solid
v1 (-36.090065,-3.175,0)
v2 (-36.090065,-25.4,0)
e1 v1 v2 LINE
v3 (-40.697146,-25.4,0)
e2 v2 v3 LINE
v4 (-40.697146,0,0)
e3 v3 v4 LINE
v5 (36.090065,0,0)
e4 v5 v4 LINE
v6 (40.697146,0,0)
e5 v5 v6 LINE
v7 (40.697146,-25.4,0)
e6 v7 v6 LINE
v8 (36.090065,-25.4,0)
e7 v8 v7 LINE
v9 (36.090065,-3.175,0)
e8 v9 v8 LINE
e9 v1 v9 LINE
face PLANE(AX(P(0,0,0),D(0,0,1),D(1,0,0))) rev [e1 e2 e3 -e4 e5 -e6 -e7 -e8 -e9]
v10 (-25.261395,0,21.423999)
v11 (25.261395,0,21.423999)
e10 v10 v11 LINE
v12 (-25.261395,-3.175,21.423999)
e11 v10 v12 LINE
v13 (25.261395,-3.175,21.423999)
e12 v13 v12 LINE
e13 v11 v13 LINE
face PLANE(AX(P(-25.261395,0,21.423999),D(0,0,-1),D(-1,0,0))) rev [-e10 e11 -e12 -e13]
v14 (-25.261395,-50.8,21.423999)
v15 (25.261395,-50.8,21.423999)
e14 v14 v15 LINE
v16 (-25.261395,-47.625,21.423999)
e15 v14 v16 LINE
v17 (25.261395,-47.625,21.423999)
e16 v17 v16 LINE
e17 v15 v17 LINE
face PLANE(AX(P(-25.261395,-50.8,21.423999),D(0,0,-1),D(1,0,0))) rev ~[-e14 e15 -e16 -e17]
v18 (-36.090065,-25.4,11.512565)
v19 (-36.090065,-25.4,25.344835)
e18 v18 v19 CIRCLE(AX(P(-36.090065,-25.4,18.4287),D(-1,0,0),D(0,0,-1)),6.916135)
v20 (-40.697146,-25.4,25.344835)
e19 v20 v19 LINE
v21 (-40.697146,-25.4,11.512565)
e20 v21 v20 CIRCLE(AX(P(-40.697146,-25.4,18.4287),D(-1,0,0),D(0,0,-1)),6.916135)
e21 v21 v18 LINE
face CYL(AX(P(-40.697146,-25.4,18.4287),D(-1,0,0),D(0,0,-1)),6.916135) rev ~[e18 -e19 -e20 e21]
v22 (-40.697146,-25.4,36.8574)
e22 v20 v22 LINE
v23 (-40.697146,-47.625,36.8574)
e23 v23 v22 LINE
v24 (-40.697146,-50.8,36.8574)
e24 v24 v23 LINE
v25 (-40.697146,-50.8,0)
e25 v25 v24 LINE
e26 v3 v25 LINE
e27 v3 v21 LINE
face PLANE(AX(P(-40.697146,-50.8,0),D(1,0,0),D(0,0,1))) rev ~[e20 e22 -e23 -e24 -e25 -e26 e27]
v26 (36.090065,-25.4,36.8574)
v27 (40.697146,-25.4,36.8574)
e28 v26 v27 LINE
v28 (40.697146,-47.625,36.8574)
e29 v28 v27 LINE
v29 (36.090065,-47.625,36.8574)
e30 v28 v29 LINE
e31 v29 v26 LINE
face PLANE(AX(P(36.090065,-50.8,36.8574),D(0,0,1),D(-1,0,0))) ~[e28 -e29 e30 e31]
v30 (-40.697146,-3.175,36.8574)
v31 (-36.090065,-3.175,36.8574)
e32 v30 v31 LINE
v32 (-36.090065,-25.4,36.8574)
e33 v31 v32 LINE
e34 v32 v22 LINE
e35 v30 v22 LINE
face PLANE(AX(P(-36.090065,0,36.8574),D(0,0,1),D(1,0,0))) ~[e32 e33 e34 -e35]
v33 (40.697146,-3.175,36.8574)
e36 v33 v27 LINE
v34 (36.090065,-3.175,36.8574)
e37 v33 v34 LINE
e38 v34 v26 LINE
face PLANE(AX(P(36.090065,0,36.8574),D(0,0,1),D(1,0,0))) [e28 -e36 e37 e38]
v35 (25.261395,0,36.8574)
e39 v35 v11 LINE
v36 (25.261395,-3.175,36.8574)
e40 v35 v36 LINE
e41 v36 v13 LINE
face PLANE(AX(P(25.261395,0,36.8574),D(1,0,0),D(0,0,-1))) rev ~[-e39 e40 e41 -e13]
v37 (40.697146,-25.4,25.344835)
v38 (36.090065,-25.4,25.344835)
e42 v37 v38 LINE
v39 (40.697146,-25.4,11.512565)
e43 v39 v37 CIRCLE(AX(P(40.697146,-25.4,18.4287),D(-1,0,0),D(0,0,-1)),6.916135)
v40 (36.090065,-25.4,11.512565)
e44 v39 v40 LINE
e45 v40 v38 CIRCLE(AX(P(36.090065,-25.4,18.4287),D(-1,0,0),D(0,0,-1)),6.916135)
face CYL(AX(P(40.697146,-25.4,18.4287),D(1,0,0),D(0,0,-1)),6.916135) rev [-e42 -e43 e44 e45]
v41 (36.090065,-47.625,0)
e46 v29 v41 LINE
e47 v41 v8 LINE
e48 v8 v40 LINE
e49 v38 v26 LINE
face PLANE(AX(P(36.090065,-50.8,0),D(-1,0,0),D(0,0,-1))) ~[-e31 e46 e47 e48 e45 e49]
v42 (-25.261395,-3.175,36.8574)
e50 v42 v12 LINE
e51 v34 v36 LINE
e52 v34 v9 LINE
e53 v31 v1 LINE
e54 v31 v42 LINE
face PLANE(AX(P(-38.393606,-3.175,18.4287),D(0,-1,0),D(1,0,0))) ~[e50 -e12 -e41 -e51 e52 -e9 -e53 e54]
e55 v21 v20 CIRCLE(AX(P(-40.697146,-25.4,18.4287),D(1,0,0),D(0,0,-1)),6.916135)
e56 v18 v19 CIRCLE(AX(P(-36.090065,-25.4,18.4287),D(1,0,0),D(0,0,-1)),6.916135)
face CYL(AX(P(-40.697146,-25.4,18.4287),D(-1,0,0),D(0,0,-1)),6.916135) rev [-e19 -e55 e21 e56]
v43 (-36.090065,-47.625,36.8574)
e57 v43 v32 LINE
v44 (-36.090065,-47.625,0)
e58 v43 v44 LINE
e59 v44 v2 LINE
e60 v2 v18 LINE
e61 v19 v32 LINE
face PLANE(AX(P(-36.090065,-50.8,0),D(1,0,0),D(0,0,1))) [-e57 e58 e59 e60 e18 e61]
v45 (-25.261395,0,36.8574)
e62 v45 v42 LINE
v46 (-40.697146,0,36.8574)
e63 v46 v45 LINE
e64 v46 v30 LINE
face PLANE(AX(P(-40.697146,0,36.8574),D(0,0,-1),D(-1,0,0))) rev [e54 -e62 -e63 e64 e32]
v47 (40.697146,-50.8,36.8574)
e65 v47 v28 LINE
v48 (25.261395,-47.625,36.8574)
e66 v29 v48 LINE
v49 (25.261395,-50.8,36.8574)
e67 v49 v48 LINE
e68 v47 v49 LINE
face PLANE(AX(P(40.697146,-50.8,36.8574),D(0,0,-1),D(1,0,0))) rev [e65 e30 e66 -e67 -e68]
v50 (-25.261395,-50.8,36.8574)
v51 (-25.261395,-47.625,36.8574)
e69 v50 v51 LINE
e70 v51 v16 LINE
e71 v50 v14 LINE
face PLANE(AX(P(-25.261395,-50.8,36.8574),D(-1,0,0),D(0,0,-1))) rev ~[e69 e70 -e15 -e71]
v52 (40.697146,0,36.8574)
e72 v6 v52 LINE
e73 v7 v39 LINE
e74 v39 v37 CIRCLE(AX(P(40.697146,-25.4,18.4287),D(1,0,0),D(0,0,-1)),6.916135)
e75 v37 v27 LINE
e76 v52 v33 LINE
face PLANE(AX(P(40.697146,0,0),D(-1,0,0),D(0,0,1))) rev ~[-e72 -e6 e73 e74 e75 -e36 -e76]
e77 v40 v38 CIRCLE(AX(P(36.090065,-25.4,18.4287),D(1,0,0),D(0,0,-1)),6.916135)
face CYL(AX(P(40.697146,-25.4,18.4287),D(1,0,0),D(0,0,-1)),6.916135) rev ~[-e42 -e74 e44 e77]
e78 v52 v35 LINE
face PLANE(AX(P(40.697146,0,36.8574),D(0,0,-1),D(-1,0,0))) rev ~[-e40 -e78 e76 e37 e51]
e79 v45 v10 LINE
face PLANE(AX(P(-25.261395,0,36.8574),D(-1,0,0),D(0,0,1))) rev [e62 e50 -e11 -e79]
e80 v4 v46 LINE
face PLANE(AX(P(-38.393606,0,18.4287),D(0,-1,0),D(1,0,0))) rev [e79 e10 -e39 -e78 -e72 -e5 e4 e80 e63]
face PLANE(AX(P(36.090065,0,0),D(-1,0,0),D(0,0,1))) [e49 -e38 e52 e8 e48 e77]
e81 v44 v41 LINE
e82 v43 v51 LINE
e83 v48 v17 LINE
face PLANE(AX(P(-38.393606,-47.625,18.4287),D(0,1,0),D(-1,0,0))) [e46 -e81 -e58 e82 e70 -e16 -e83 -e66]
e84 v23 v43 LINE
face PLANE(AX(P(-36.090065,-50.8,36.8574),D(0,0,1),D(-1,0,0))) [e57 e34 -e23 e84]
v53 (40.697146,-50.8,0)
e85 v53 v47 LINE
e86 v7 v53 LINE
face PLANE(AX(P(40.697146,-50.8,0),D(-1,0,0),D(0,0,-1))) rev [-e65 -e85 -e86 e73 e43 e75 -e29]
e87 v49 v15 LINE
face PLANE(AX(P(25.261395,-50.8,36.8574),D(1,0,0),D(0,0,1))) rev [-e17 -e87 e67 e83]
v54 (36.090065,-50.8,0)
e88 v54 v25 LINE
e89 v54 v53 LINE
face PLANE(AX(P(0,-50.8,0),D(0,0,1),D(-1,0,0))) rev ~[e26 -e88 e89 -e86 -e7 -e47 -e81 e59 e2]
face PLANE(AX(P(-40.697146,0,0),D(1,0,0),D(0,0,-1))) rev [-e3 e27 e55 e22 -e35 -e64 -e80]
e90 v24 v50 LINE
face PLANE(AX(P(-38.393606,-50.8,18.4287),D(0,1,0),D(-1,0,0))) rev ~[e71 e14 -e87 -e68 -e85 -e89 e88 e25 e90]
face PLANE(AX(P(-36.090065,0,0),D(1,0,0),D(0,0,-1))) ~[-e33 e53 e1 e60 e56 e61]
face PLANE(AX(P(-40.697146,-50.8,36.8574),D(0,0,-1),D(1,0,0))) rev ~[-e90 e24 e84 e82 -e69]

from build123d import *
from build123d import SkipClean  # not in build123d's __all__

# Parameters (mm, degrees)
F0_W     = 4.6070814133
F0_H     = 36.8574000895
F1_DEPTH = 3.175
F2_DEPTH = 25.4
F4_DEPTH = 6.35


# Not quite as in the source:
# - a feature names something its author has since deleted; it is built from what else it names


with BuildPart() as f1:
    # F0 (on Front) → F1 (new body)
    with BuildSketch(Plane.XZ):
        with Locations((38.3936055005, 18.4287000448)):
            Rectangle(F0_W, F0_H)
        Polygon((0, 21.4239992201), (0, 0), (36.0900647938, 0), (36.0900647938, 36.8574000895), (25.2613946795, 36.8574000895), (25.2613946795, 21.4239992201), align=None)
        Polygon((0, 21.4239992201), (0, 0), (36.0900647938, 0), (36.0900647938, 36.8574000895), (25.2613946795, 36.8574000895), (25.2613946795, 21.4239992201), align=None)
    extrude(amount=F1_DEPTH)

    # F0 (on Front) → F2 (join)
    with BuildSketch(Plane.XZ):
        with Locations((38.3936055005, 18.4287000448)):
            Rectangle(F0_W, F0_H)
    extrude(amount=F2_DEPTH)

    # F3 (on face) → F4 (cut)
    with BuildSketch(Plane.YZ.offset(40.6971462071)):
        with BuildLine():
            Line((-25.4, 25.344834663), (-25.4, 11.5125654265))
            ThreePointArc((-25.4, 11.5125654265), (-18.4838653818, 18.4287000448), (-25.4, 25.344834663))
        make_face()
    extrude(amount=-F4_DEPTH, mode=Mode.SUBTRACT)

    # F5: F1 across plane


with BuildPart() as f1_1:
    add(f1.part, clean=False)
    add(f1.part.mirror(Plane.YZ), clean=False)

    # F6: F1 across face


with BuildPart() as f1_2:
    add(f1_1.part, clean=False)
    with SkipClean():  # cleaning this boolean's faces spoils the solid; the shape is the same uncleaned
        add(f1_1.part.mirror(Plane(origin=(38.3936055005, -25.4, 5.7562827133), x_dir=(1, 0, 0), z_dir=(0, -1, 0))), clean=False)


solid = f1_2.part
